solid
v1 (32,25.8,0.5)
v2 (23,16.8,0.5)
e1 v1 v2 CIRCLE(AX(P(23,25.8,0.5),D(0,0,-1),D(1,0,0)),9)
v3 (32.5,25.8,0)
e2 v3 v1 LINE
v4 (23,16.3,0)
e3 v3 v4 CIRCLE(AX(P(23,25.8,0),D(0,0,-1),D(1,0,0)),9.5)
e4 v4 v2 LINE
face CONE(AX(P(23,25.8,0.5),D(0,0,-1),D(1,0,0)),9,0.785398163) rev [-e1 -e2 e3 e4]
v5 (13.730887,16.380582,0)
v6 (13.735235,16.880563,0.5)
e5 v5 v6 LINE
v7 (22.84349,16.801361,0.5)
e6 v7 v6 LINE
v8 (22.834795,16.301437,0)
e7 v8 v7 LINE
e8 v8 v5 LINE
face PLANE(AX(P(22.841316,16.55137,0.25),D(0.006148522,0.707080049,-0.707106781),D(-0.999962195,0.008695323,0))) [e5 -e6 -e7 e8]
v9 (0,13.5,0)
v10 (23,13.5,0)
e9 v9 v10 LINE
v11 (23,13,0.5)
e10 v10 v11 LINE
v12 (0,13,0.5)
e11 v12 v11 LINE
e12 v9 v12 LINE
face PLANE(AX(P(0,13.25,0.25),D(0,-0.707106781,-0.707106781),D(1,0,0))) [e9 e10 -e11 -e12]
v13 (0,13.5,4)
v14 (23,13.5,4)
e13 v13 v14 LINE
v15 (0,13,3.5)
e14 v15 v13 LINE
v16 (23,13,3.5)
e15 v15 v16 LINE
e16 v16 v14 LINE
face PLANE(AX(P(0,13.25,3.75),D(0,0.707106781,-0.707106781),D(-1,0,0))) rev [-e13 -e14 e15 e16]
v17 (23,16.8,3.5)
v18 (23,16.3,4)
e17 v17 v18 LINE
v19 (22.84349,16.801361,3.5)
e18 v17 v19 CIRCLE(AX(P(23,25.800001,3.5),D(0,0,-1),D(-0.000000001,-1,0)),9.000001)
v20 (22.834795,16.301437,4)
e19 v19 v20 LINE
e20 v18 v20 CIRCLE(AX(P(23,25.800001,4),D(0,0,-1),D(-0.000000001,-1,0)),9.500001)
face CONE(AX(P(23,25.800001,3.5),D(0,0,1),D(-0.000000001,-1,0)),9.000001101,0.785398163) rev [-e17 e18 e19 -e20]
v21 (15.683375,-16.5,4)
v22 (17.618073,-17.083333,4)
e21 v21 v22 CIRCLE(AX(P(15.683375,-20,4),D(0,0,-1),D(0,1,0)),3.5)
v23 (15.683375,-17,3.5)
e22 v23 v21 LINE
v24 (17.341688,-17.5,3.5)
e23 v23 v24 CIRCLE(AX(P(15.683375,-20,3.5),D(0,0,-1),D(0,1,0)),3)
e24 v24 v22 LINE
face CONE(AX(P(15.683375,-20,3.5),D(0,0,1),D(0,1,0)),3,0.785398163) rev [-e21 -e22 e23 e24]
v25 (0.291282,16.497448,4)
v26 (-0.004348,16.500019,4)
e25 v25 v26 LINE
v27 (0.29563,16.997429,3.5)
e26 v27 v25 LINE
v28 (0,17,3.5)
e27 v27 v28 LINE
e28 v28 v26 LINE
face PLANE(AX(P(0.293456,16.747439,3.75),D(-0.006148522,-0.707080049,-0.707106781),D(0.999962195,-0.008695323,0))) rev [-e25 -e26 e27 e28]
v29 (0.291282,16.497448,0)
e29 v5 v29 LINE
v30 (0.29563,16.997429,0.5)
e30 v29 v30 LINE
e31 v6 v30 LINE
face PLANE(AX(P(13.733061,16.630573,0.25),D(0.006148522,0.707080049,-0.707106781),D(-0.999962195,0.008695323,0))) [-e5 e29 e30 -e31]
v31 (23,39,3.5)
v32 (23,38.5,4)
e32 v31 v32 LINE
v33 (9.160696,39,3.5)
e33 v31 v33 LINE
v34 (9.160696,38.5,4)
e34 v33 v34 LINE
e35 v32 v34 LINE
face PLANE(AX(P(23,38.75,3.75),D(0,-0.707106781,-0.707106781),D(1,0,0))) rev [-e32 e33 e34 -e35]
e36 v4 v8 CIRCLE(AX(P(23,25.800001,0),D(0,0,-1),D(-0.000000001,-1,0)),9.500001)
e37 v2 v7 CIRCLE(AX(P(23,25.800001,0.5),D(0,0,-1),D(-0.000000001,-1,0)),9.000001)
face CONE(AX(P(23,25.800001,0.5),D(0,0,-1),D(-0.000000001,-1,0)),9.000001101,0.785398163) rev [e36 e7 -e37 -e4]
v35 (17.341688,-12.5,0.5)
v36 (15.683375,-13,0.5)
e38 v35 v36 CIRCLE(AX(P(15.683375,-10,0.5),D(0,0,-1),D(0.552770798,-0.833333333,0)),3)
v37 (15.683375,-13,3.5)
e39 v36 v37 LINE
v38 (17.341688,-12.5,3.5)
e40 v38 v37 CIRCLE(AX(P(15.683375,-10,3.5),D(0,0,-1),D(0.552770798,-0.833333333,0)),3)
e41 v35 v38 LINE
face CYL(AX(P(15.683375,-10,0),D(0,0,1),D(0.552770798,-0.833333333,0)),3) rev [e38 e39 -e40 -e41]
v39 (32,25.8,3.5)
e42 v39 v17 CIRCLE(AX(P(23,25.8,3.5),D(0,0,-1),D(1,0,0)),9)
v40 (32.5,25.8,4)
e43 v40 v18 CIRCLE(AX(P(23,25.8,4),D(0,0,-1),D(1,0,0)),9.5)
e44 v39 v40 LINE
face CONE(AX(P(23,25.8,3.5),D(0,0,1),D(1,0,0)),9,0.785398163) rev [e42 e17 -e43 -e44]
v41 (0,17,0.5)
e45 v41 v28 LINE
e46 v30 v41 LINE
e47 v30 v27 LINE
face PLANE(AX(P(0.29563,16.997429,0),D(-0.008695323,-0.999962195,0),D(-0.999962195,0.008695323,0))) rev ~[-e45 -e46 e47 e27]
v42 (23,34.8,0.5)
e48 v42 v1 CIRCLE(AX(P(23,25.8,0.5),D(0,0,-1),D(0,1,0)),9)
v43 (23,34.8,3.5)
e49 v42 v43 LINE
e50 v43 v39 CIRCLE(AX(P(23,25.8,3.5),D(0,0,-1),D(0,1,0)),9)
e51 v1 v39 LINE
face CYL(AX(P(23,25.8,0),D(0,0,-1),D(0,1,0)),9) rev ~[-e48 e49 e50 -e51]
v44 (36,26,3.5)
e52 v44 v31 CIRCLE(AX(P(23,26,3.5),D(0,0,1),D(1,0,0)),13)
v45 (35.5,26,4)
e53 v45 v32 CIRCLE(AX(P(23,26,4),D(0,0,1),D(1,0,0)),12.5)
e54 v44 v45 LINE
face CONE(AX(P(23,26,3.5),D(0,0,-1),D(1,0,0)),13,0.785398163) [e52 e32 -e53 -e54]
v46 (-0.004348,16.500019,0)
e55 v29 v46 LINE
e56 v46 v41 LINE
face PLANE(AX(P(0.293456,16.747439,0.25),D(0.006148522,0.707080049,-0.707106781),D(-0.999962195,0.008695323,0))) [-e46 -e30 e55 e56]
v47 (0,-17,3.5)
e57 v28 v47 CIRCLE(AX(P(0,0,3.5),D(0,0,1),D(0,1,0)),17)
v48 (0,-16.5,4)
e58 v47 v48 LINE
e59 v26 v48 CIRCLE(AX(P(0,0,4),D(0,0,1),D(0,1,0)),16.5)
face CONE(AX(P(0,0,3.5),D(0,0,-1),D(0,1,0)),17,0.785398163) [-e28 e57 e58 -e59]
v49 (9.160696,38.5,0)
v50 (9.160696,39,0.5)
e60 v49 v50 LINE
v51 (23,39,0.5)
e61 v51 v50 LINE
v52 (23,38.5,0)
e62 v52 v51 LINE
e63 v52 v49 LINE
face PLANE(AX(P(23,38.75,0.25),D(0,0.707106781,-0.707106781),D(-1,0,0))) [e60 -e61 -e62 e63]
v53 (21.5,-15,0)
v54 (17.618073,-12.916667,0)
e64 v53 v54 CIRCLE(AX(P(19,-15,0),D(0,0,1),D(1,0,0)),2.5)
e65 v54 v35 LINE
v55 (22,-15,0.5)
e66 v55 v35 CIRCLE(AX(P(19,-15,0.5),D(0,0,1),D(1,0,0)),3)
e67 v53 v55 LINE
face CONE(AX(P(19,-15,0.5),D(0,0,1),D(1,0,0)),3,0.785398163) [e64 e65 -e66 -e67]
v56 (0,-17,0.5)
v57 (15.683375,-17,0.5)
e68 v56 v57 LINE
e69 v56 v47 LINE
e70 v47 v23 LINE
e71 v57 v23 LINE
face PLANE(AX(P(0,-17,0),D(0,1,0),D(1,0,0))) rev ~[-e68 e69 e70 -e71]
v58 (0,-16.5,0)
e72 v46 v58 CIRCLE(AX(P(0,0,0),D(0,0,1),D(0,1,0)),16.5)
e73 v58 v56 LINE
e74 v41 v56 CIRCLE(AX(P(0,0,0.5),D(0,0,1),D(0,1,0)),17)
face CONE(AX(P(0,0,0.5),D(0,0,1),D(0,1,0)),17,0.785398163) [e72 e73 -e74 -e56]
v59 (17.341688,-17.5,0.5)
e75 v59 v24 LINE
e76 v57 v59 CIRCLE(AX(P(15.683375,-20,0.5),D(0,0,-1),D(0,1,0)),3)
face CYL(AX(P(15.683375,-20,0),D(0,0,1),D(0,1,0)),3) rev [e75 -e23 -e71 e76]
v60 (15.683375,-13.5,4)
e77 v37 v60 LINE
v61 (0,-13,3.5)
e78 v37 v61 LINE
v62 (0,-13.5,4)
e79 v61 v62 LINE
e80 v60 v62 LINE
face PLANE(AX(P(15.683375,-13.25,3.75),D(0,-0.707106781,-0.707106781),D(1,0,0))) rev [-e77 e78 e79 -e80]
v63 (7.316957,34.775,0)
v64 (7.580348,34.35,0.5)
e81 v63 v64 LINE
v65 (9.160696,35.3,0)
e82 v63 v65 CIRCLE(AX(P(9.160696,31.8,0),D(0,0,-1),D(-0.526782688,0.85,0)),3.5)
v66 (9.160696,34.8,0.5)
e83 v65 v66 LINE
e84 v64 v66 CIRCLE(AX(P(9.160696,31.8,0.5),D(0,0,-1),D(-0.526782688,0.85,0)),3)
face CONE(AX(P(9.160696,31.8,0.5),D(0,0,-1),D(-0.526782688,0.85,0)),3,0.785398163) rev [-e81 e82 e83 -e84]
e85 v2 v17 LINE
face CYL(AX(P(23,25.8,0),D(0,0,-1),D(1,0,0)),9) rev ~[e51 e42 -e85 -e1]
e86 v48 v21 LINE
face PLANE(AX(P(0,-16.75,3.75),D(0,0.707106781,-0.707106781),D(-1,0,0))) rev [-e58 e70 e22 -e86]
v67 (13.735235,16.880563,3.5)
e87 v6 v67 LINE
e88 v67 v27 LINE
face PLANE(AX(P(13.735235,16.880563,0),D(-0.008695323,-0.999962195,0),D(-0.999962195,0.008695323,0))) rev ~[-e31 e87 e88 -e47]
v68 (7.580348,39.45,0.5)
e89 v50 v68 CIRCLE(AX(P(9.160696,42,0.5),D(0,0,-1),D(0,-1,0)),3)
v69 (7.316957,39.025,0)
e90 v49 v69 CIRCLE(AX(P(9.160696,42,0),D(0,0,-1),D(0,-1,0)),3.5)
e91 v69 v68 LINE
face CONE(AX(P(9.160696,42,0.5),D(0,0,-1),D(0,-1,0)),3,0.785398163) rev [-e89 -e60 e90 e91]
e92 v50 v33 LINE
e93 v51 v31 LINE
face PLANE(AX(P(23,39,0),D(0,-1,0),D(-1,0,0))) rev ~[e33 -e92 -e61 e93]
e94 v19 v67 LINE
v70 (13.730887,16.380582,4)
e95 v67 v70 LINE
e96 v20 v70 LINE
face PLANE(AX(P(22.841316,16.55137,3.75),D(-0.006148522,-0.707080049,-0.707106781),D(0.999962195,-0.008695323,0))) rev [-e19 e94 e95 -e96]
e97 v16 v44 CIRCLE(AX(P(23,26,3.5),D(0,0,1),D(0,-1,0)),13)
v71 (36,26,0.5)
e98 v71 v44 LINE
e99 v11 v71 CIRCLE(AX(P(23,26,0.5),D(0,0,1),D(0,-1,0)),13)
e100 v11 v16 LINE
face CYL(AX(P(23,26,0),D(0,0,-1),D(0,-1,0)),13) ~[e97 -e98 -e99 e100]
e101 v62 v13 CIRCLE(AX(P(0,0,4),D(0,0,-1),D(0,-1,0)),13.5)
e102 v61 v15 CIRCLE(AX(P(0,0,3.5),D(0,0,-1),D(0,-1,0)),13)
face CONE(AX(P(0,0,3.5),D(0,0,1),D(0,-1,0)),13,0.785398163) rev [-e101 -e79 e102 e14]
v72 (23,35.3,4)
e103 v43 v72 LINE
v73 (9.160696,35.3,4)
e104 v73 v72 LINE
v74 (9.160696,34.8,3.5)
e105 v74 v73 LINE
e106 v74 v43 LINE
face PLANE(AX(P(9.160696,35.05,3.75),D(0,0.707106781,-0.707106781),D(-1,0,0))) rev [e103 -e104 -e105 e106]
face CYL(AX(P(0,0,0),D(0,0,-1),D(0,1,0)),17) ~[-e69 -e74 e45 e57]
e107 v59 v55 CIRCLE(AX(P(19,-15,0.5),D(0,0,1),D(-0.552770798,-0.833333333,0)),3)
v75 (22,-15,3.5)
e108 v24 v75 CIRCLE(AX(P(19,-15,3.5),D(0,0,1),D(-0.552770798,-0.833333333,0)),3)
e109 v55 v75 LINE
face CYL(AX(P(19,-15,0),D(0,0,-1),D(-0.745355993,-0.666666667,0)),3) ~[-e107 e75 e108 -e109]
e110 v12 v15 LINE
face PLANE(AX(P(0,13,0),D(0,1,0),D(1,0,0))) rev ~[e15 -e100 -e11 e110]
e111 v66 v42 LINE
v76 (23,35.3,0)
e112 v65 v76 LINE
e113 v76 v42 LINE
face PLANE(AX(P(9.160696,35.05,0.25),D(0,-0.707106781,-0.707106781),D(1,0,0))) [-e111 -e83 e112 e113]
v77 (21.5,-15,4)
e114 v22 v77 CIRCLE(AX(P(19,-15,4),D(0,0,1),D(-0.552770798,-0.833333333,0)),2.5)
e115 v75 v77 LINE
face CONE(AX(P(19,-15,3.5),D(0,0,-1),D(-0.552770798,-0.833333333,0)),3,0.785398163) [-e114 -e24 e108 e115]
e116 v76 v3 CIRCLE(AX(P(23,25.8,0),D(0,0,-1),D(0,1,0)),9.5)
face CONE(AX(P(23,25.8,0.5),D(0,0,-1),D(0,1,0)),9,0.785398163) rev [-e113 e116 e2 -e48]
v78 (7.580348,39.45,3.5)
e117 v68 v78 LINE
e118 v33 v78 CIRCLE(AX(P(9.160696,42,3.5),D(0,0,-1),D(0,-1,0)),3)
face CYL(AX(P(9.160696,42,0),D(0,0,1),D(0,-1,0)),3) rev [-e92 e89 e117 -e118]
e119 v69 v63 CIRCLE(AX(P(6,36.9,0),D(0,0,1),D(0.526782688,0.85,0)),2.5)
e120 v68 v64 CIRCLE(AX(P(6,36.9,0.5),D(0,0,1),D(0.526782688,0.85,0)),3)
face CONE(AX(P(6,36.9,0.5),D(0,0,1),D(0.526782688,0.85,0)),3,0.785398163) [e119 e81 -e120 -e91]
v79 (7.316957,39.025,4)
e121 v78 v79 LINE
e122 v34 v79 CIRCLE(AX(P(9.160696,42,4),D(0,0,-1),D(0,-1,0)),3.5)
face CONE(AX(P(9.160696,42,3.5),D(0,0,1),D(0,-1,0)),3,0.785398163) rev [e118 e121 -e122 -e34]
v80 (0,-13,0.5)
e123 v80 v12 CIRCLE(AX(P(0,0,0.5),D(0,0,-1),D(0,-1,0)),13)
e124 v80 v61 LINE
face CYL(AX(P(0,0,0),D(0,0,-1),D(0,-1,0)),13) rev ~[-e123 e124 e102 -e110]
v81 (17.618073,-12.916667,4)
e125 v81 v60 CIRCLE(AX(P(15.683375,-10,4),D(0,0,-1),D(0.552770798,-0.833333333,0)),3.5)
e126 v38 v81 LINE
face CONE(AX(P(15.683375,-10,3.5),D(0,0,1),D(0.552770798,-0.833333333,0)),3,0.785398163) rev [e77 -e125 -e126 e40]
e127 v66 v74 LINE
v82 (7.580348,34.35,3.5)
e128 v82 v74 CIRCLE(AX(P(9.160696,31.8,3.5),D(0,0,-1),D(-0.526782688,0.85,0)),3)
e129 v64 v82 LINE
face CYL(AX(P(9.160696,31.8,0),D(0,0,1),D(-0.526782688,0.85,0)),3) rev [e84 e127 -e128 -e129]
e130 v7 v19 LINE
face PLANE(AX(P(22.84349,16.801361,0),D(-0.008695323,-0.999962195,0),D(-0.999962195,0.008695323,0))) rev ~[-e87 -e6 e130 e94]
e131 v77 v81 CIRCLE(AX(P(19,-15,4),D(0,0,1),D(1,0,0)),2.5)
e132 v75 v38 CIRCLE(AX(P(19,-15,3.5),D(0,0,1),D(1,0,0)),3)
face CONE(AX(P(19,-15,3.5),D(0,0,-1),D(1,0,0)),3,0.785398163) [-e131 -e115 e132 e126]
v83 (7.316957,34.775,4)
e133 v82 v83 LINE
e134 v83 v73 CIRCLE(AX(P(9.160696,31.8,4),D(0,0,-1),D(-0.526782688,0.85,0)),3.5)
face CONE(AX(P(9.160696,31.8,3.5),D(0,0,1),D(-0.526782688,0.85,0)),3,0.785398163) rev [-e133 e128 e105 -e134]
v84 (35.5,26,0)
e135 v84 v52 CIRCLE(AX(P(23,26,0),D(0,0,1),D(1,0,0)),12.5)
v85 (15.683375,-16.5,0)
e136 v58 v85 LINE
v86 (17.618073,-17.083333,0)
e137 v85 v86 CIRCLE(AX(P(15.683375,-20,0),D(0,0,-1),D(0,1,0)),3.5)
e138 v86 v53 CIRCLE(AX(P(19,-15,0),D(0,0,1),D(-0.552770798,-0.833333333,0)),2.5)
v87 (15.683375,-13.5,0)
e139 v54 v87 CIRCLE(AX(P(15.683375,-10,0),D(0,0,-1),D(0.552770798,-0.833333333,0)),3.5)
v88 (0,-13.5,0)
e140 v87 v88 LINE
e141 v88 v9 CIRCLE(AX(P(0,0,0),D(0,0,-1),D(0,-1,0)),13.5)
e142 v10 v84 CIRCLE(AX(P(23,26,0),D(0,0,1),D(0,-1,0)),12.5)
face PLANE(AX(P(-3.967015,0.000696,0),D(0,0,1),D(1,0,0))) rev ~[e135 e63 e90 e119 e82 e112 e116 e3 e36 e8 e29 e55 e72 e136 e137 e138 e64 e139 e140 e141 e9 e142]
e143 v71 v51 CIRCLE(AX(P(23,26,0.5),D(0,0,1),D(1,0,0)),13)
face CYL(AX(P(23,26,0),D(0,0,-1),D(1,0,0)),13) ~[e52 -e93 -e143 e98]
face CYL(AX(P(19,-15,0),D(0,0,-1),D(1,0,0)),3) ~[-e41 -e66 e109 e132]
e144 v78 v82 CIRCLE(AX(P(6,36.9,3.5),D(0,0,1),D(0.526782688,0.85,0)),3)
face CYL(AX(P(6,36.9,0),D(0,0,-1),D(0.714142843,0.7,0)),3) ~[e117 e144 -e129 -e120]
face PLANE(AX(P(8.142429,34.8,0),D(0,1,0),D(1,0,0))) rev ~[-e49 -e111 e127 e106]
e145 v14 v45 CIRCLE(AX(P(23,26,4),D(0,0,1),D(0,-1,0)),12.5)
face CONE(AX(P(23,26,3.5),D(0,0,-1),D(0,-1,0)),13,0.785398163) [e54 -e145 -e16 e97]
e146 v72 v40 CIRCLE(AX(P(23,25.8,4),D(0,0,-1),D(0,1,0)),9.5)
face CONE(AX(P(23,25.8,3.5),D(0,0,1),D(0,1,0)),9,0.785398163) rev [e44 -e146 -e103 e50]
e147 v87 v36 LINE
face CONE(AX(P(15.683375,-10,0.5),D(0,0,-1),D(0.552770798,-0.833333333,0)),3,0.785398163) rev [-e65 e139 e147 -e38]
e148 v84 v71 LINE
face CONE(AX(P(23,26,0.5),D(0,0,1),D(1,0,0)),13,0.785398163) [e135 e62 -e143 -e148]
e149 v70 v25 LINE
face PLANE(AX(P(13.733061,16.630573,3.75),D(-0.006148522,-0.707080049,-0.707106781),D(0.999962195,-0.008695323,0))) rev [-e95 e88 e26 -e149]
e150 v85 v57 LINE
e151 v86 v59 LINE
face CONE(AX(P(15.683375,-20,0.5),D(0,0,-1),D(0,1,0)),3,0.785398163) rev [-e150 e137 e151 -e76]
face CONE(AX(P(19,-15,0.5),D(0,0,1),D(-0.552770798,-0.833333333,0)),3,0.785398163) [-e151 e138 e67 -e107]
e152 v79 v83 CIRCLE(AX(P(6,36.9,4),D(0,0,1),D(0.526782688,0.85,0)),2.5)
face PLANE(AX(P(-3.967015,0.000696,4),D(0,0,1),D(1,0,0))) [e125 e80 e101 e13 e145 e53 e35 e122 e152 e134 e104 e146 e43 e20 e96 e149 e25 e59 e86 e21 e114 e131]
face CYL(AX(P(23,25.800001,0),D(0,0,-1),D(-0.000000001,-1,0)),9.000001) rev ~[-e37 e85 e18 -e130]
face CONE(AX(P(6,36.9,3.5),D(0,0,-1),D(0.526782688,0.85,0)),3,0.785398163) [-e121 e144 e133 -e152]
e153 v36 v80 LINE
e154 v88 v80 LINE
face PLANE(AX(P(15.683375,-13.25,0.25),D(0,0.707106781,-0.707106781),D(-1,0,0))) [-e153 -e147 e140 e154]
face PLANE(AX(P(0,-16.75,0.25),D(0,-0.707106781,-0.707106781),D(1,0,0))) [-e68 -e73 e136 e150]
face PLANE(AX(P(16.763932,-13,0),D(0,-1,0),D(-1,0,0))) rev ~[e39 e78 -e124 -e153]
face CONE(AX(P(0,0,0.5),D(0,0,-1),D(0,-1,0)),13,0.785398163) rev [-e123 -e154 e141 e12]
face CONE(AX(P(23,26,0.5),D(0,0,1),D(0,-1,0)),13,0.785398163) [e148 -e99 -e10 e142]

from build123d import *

# Parameters (mm, degrees)
F1_DEPTH = 4
F2_R     = 3
F3_SIZE  = 0.5


with BuildPart() as f1:
    # F0 (on Top) → F1 (new body)
    with BuildSketch(Plane.XY):
        with BuildLine():
            Line((0.2956298201, 16.9974293059), (0, 17))
            ThreePointArc((0, 17), (-17, 0), (0, -17))
            ThreePointArc((0, -17), (5.8309518948, -15.9687194227), (10.9544511501, -13))
            Line((10.9544511501, -13), (0, -13))
            ThreePointArc((0, -13), (-13, 0), (0, 13))
            Line((0, 13), (10.9544511501, 13))
            ThreePointArc((10.9544511501, 13), (5.9695846357, 15.9174137119), (0.2956298201, 16.9974293059))
        make_face()
        with BuildLine():
            ThreePointArc((10.9544511501, -13), (5.8309518948, -15.9687194227), (0, -17))
            Line((0, -17), (16.7639320225, -17))
            ThreePointArc((16.7639320225, -17), (16, -15), (16.7639320225, -13))
            Line((16.7639320225, -13), (10.9544511501, -13))
        make_face()
        with BuildLine():
            Line((13.73523492, 16.8805631746), (0.2956298201, 16.9974293059))
            ThreePointArc((0.2956298201, 16.9974293059), (5.9695846357, 15.9174137119), (10.9544511501, 13))
            Line((10.9544511501, 13), (23, 13))
            ThreePointArc((23, 13), (17.9776837381, 14.0093228146), (13.73523492, 16.8805631746))
        make_face()
        with BuildLine():
            ThreePointArc((16.7639320225, -13), (16, -15), (16.7639320225, -17))
            Line((16.7639320225, -17), (19, -17))
            Line((19, -17), (19, -13))
            Line((19, -13), (16.7639320225, -13))
        make_face()
        with BuildLine():
            Line((19, -17), (16.7639320225, -17))
            ThreePointArc((16.7639320225, -17), (20.0704662693, -17.8025170769), (22, -15))
            ThreePointArc((22, -15), (20.0704662693, -12.1974829231), (16.7639320225, -13))
            Line((16.7639320225, -13), (19, -13))
            Line((19, -13), (19, -17))
        make_face()
        with BuildLine():
            Line((22.8434900953, 16.8013609557), (13.73523492, 16.8805631746))
            ThreePointArc((13.73523492, 16.8805631746), (17.9776837381, 14.0093228146), (23, 13))
            ThreePointArc((23, 13), (32.1923881554, 16.8076118446), (36, 26))
            ThreePointArc((36, 26), (32.1923881554, 35.1923881554), (23, 39))
            ThreePointArc((23, 39), (17.775059809, 37.903780912), (13.4313010289, 34.8))
            Line((13.4313010289, 34.8), (23, 34.8))
            ThreePointArc((23, 34.8), (29.3639610307, 32.1639610307), (32, 25.8))
            ThreePointArc((32, 25.8), (29.3639610307, 19.4360389693), (23, 16.8))
            ThreePointArc((23, 16.8), (22.9217420891, 16.8003402454), (22.8434900953, 16.8013609557))
        make_face()
        with BuildLine():
            Line((8.1424285286, 34.8), (13.4313010289, 34.8))
            ThreePointArc((13.4313010289, 34.8), (17.775059809, 37.903780912), (23, 39))
            Line((23, 39), (8.1424285286, 39))
            ThreePointArc((8.1424285286, 39), (8.7773445578, 38.0341768853), (9, 36.9))
            ThreePointArc((9, 36.9), (8.7773445578, 35.7658231147), (8.1424285286, 34.8))
        make_face()
        with BuildLine():
            ThreePointArc((8.1424285286, 39), (3, 36.9), (8.1424285286, 34.8))
            Line((8.1424285286, 34.8), (6, 34.8))
            Line((6, 34.8), (6, 39))
            Line((6, 39), (8.1424285286, 39))
        make_face()
        with BuildLine():
            Line((6, 34.8), (8.1424285286, 34.8))
            ThreePointArc((8.1424285286, 34.8), (8.7773445578, 35.7658231147), (9, 36.9))
            ThreePointArc((9, 36.9), (8.7773445578, 38.0341768853), (8.1424285286, 39))
            Line((8.1424285286, 39), (6, 39))
            Line((6, 39), (6, 34.8))
        make_face()
    extrude(amount=F1_DEPTH)

    # F2
    f2_edges = [f1.edges().sort_by_distance(p)[0] for p in [
        (16.763932, -17, 2),
        (8.142429, 34.8, 2),
        (16.763932, -13, 2),
        (8.142429, 39, 2),
    ]]
    fillet(f2_edges, radius=F2_R)

    # F3
    f3_edges = [f1.edges().sort_by_distance(p)[0] for p in [
        (7.841688, -17, 4),
        (7.841688, -13, 4),
        (-13, 0, 4),
        (-17, 0, 4),
        (11.5, 13, 4),
        (11.421745, 16.90068, 4),
        (22, -15, 4),
        (16.549401, -12.872281, 4),
        (16.549401, -17.127719, 4),
        (36, 26, 4),
        (31.99966, 25.721742, 4),
        (16.080348, 34.8, 4),
        (16.080348, 39, 4),
        (8.339112, 34.685308, 4),
        (8.339112, 39.114692, 4),
        (3, 36.9, 4),
        (22, -15, 0),
        (16.549401, -17.127719, 0),
        (7.841688, -13, 0),
        (7.841688, -17, 0),
        (16.549401, -12.872281, 0),
        (-13, 0, 0),
        (-17, 0, 0),
        (11.5, 13, 0),
        (11.421745, 16.90068, 0),
        (31.99966, 25.721742, 0),
        (16.080348, 34.8, 0),
        (8.339112, 34.685308, 0),
        (3, 36.9, 0),
        (36, 26, 0),
        (8.339112, 39.114692, 0),
        (16.080348, 39, 0),
    ]]
    chamfer(f3_edges, length=F3_SIZE)


solid = f1.part
